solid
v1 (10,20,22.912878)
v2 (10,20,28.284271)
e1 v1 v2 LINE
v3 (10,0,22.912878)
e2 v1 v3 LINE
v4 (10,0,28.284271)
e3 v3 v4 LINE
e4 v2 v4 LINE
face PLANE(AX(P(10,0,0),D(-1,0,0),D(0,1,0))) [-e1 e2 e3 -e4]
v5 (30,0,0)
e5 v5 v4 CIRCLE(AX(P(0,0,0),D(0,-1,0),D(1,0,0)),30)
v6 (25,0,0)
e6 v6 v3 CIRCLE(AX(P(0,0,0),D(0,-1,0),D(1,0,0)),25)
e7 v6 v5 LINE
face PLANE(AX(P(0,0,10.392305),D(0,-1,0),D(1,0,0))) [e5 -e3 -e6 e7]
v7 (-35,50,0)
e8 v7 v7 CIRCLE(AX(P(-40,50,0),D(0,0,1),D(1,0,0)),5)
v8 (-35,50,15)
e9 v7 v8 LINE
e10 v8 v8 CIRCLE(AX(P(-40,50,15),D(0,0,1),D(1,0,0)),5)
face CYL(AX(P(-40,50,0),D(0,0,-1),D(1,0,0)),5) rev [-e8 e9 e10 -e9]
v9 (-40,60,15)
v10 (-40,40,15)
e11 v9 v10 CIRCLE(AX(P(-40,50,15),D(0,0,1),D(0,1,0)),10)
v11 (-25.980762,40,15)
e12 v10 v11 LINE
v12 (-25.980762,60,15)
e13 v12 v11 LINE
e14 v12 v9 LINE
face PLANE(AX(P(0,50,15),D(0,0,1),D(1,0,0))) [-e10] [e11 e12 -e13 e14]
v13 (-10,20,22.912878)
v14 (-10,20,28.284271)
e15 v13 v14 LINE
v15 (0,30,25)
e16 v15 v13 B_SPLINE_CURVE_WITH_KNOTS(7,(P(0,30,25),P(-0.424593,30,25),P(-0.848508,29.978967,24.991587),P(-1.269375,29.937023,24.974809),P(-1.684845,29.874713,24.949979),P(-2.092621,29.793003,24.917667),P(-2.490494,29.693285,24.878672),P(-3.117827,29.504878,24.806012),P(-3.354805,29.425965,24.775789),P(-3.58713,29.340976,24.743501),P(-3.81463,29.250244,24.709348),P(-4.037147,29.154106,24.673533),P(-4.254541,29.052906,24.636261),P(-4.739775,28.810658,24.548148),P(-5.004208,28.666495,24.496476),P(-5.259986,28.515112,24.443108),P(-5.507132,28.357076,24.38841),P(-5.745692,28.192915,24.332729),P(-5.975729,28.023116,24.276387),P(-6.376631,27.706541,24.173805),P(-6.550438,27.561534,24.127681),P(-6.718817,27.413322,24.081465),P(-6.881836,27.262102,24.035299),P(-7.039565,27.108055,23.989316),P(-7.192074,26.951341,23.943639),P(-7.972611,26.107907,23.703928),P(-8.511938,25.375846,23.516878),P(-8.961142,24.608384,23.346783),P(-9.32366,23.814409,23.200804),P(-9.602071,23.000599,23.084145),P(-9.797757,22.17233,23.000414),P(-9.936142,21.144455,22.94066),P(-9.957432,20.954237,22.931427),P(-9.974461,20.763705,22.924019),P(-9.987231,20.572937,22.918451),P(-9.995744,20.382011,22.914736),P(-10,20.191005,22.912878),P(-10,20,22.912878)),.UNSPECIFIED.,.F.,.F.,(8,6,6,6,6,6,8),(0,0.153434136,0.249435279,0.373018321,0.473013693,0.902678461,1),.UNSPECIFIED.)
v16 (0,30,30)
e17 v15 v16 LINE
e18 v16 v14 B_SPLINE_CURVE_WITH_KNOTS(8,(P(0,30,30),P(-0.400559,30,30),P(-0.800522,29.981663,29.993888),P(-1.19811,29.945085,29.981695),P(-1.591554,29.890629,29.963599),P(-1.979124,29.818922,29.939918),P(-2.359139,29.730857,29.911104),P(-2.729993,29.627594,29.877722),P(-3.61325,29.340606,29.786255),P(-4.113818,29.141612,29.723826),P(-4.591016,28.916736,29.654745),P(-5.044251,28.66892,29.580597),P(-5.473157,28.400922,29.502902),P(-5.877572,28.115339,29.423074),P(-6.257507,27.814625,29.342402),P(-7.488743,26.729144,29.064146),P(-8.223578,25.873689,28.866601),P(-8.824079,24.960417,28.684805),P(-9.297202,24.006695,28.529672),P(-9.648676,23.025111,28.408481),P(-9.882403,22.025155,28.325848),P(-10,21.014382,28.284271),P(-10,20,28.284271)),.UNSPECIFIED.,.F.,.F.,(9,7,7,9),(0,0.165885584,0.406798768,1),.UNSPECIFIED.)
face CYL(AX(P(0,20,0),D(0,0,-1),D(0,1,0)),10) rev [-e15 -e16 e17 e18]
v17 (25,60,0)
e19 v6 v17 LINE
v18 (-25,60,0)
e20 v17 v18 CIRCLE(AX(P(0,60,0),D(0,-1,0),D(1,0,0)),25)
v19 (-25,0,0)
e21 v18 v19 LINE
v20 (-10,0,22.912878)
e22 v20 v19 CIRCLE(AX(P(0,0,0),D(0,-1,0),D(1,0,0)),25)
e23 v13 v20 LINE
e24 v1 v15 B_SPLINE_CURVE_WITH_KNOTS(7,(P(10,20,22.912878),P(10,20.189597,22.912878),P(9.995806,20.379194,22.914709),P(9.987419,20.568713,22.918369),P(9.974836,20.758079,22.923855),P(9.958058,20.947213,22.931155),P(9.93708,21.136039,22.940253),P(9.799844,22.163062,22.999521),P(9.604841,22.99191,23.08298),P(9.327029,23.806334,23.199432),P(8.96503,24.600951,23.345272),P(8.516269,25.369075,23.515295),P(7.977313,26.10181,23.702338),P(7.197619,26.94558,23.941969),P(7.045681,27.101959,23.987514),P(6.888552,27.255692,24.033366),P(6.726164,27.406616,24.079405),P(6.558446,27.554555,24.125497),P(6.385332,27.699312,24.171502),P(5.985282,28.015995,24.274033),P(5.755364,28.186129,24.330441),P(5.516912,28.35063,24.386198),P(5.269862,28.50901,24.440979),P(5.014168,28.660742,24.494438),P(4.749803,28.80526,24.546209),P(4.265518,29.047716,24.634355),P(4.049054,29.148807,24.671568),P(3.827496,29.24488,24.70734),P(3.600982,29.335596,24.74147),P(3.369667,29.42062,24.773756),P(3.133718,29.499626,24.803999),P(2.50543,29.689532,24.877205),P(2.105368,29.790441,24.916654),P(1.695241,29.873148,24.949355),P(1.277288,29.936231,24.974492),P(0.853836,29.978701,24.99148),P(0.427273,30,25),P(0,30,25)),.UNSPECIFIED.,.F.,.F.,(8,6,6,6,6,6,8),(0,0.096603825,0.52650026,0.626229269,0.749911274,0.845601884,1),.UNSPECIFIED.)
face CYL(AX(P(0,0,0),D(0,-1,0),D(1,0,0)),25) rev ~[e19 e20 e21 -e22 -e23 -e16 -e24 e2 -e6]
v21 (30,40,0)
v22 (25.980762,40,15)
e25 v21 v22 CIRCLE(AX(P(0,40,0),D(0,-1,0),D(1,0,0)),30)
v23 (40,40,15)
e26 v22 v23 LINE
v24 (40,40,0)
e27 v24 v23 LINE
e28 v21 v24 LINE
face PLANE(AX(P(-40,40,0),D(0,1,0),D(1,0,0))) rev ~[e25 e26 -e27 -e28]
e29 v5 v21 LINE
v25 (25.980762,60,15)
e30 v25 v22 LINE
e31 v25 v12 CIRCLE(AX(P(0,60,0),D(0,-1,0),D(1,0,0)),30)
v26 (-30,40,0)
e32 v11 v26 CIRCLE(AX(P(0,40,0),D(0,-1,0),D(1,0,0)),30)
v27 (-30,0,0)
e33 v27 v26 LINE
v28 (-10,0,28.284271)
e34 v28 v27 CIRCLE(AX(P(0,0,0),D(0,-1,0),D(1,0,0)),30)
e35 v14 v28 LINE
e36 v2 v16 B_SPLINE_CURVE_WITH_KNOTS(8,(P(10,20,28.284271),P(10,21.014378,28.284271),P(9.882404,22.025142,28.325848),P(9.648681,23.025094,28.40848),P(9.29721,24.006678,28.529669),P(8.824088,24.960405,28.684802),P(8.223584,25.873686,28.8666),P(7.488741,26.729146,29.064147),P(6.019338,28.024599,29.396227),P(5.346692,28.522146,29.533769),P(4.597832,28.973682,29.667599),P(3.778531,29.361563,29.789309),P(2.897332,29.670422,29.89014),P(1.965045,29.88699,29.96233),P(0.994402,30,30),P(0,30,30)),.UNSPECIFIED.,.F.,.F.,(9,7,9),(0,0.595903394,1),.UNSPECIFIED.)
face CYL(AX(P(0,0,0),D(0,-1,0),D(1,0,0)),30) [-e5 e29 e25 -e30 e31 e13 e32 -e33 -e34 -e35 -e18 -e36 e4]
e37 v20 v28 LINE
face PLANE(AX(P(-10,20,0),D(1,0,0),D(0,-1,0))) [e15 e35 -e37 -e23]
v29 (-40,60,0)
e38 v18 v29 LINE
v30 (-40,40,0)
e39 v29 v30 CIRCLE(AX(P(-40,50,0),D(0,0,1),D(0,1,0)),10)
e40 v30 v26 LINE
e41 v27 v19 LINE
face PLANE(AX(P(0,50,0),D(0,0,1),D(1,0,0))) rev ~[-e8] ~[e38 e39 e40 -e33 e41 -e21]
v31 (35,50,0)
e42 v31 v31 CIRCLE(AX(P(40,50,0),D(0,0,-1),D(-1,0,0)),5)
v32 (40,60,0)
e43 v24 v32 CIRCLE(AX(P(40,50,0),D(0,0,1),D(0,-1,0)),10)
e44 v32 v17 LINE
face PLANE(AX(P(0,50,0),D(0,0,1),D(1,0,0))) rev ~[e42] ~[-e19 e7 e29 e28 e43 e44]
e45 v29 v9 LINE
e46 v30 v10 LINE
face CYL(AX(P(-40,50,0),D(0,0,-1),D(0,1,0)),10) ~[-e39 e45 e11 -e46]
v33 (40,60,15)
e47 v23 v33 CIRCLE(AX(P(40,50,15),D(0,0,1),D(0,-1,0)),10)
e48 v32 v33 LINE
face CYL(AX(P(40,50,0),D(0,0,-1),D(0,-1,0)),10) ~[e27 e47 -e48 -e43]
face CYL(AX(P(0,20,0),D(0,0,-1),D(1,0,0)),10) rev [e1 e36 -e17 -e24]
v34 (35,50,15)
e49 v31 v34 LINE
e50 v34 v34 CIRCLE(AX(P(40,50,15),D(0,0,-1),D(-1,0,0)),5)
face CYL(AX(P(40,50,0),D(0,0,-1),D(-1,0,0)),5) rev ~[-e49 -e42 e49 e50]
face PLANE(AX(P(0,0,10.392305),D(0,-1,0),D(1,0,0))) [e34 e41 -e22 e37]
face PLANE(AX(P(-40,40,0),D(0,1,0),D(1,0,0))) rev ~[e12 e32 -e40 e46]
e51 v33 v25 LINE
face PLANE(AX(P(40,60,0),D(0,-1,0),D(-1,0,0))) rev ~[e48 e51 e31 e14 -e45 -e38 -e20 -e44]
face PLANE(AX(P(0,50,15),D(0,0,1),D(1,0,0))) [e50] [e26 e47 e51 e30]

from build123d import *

# Parameters (mm, degrees)
F1_DEPTH = 60
F3_DEPTH = 15
F4_R     = 5
F5_DEPTH = 15
F7_DEPTH = 30.0010001
F8_R     = 25
F9_DEPTH = 60.0010001


# Not quite as in the source:
# - a pattern or mirror of a feature is missing from the dataset's text; its kind, count and spacing are read off the source's solid


with BuildPart() as f1:
    # F0 (on Front) → F1 (new body)
    with BuildSketch(Plane.XZ):
        with BuildLine():
            Line((-30, 0), (30, 0))
            ThreePointArc((30, 0), (0, 30), (-30, 0))
        make_face()
    extrude(amount=-F1_DEPTH)

    # F2 (on Top) → F3 (join)
    with BuildSketch(Plane.XY):
        with BuildLine():
            ThreePointArc((-40, 60), (-50, 50), (-40, 40))
            Line((-40, 40), (40, 40))
            ThreePointArc((40, 40), (50, 50), (40, 60))
            Line((40, 60), (-40, 60))
        make_face()
    extrude(amount=F3_DEPTH)

    # F4 (on Top) → F5 (cut, through all)
    with BuildSketch(Plane.XY):
        with Locations((-40, 50)):
            Circle(F4_R)
    f5 = extrude(amount=F5_DEPTH, mode=Mode.SUBTRACT)

    # F5_copies: F5 across plane
    add(f5.mirror(Plane(origin=(0, 0, 0), x_dir=(0, 0, 1), z_dir=(1, 0, 0))), mode=Mode.SUBTRACT)

    # F6 (on Top) → F7 (cut, through all)
    with BuildSketch(Plane.XY):
        with BuildLine():
            Line((-10, 20), (-10, 0))
            Line((-10, 0), (0, 0))
            Line((0, 0), (0, 30))
            ThreePointArc((0, 30), (-7.0710678119, 27.0710678119), (-10, 20))
        make_face()
        with BuildLine():
            Line((0, 30), (0, 0))
            Line((0, 0), (10, 0))
            Line((10, 0), (10, 20))
            ThreePointArc((10, 20), (7.0710678119, 27.0710678119), (0, 30))
        make_face()
    extrude(amount=F7_DEPTH, mode=Mode.SUBTRACT)

    # F8 (on face) → F9 (cut, through all)
    with BuildSketch(Plane.XZ):
        Circle(F8_R)
    extrude(amount=-F9_DEPTH, mode=Mode.SUBTRACT)


solid = f1.part
